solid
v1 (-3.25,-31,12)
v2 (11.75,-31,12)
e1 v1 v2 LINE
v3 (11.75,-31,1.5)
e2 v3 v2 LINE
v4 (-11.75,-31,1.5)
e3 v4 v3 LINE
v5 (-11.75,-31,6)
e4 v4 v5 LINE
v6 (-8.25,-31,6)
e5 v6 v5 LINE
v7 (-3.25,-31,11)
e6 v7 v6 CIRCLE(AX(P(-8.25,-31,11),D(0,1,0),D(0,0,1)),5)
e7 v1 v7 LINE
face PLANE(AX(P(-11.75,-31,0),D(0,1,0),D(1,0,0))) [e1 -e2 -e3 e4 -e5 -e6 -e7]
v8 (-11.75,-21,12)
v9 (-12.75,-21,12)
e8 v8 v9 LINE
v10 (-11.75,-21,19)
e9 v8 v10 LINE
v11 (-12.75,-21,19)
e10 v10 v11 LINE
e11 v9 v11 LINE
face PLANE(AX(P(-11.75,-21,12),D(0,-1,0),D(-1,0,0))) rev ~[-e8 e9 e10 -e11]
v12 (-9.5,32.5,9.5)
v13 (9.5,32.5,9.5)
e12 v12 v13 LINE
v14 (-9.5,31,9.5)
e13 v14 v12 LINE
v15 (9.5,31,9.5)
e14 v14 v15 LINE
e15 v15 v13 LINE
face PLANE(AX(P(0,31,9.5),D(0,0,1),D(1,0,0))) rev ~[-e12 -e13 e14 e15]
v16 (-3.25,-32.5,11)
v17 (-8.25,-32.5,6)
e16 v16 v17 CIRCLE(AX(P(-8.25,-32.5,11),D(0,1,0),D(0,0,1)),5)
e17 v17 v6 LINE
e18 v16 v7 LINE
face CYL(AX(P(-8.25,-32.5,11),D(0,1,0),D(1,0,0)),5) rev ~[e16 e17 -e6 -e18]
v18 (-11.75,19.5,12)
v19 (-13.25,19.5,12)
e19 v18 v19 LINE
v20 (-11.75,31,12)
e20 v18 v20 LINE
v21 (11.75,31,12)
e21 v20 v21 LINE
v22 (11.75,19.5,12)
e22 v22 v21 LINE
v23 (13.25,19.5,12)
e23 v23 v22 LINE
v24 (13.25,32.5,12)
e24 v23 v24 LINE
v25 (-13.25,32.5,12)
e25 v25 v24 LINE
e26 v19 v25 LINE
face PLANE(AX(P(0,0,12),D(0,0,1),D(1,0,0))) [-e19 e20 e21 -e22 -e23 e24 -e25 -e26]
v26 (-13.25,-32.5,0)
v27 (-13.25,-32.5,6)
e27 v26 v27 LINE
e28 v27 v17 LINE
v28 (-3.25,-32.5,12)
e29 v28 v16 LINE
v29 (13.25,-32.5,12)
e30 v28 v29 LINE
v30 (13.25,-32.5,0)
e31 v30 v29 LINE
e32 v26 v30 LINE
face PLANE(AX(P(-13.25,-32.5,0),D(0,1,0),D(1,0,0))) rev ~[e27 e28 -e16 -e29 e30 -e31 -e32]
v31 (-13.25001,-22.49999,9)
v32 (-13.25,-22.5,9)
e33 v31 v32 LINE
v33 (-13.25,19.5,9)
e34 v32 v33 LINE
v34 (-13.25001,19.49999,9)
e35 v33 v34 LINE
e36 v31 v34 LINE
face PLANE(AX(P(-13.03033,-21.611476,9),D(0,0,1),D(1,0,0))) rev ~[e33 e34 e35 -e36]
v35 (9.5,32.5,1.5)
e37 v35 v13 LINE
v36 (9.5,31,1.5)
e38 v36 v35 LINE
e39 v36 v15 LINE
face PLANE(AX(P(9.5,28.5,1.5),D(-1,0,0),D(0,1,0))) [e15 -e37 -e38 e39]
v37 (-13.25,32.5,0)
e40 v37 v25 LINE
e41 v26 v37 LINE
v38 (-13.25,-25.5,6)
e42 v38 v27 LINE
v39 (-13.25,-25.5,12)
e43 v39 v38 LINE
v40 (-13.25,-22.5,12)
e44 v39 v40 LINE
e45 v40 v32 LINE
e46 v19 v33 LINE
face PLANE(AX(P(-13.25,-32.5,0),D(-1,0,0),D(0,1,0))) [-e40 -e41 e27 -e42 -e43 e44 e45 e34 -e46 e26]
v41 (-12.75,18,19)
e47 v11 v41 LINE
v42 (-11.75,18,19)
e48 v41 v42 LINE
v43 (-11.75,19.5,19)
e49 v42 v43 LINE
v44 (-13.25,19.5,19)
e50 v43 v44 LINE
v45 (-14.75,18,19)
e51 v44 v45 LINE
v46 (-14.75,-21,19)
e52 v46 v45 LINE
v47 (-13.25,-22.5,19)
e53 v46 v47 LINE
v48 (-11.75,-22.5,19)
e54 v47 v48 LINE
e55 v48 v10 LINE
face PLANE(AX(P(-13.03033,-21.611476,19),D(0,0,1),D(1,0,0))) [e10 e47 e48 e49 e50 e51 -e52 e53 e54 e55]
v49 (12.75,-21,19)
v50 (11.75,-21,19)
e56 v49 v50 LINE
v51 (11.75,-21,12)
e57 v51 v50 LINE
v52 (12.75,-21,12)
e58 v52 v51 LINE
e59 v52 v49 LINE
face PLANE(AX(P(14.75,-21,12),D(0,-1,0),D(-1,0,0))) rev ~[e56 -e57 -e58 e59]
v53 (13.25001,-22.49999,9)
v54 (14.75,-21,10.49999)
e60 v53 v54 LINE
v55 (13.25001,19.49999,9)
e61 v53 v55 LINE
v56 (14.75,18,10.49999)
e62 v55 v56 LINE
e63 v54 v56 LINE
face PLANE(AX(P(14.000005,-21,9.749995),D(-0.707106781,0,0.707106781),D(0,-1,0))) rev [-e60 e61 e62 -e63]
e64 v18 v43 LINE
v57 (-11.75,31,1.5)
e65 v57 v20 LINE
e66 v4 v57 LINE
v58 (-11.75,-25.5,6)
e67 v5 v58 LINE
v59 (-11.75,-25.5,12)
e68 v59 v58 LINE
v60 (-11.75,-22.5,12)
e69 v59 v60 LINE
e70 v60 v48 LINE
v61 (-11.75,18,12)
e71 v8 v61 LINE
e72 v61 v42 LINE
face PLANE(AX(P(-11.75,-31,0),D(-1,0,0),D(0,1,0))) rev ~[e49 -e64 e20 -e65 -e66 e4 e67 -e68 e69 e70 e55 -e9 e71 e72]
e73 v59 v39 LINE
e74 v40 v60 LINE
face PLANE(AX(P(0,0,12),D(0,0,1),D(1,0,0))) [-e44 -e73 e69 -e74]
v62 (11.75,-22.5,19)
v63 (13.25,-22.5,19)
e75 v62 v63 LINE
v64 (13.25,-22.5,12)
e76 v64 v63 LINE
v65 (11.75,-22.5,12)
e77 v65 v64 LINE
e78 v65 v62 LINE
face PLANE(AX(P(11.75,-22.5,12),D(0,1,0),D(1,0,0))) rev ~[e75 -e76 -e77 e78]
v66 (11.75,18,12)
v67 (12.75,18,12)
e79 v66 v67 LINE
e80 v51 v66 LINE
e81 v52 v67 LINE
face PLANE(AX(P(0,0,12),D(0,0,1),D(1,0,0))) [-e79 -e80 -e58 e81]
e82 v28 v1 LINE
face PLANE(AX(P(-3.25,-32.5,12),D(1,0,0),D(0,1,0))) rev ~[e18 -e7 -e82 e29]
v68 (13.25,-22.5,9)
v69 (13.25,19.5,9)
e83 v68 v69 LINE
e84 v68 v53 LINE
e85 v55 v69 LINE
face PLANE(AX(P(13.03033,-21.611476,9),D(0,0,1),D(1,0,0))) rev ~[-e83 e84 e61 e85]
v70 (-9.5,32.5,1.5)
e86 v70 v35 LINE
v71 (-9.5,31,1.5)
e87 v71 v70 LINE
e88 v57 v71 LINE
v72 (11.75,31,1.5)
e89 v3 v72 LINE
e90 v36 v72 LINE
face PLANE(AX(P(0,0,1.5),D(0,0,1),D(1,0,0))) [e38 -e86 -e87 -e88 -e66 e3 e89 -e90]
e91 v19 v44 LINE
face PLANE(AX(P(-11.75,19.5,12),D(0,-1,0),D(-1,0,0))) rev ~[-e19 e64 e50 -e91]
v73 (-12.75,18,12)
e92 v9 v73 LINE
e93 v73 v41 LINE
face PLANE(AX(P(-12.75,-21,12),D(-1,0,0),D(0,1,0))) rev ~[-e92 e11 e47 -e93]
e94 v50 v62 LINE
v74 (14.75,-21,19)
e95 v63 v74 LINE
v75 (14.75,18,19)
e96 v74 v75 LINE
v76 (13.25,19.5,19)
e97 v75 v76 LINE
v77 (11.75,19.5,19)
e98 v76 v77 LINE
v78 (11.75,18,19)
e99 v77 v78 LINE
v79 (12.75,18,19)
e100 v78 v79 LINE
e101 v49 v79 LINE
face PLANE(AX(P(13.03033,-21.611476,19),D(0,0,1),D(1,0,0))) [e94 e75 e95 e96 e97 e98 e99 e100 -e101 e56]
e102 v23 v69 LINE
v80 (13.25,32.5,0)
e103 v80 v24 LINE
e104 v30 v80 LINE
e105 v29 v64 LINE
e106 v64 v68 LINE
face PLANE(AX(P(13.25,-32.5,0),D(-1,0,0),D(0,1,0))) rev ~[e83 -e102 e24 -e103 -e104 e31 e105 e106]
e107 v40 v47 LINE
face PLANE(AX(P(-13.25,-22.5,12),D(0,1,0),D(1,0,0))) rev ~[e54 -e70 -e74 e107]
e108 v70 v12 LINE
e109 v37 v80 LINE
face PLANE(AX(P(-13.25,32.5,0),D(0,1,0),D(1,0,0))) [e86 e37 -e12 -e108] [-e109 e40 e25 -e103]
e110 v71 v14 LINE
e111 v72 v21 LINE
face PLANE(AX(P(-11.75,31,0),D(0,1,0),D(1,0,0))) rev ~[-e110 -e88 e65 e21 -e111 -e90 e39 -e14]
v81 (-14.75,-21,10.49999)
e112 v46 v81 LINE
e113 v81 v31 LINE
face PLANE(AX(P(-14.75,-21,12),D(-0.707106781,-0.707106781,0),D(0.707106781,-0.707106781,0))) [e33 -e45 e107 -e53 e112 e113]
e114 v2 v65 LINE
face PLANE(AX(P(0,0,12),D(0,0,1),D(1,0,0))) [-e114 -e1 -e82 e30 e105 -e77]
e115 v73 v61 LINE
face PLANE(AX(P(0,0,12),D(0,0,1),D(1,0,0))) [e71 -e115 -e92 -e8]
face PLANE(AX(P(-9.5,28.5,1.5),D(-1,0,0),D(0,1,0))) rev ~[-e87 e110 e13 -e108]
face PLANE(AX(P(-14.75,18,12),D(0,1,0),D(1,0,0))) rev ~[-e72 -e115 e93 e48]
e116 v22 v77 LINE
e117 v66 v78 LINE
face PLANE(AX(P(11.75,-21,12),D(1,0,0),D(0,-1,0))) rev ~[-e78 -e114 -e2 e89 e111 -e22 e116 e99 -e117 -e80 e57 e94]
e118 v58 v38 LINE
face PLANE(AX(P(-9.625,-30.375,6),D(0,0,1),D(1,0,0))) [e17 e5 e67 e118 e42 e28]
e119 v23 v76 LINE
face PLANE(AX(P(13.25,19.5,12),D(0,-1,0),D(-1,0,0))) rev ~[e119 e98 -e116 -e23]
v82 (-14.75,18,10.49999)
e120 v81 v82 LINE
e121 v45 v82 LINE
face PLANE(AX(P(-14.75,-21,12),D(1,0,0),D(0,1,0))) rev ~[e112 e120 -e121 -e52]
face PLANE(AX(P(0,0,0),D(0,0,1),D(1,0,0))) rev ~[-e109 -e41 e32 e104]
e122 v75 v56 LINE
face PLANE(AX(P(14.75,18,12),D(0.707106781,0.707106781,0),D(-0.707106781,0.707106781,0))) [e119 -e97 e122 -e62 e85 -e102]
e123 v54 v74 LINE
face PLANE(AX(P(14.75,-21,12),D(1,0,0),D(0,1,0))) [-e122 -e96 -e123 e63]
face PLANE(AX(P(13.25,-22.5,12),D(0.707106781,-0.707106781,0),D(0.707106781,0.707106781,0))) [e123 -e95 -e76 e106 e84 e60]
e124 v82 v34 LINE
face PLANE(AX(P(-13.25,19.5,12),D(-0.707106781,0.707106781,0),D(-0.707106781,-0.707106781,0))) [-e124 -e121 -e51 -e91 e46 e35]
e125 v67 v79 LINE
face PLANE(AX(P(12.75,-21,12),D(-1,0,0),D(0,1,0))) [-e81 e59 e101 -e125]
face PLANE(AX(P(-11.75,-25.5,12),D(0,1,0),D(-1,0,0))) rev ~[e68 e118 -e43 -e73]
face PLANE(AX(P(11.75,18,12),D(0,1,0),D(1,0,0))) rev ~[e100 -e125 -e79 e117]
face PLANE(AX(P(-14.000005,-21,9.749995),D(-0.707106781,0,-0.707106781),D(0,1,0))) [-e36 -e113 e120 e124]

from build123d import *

# Parameters (mm, degrees)
F0_W      = 23.5
F0_H      = 62
F1_DEPTH  = 1.5
F2_W      = 26.5
F2_H      = 65
F2_W_2    = 23.5
F2_H_2    = 62
F3_DEPTH  = 12
F4_W      = 2
F4_H      = 39
F5_DEPTH  = 7
F7_DEPTH  = 7
F8_W      = 19
F8_H      = 5
F9_DEPTH  = 8
F11_DEPTH = 6
F12_R     = 5
F13_DEPTH = 3
F14_SIZE  = 1.49999


# Not quite as in the source:
# - a fillet or chamfer is up to 0.001 mm smaller than in the source, because OpenCascade refuses the exact size


with BuildPart() as f1:
    # F0 (on Top) → F1 (new body)
    with BuildSketch(Plane.XY):
        Rectangle(F0_W, F0_H)
    extrude(amount=F1_DEPTH)

    # F2 (on Top) → F3 (join)
    with BuildSketch(Plane.XY):
        Rectangle(F2_W, F2_H)
        Rectangle(F2_W_2, F2_H_2, mode=Mode.SUBTRACT)
    extrude(amount=F3_DEPTH)

    # F4 (on face) → F5 (join)
    with BuildSketch(Plane.XY.offset(12)):
        with Locations((-13.75, -1.5)):
            Rectangle(F4_W, F4_H)
        with Locations((13.75, -1.5)):
            Rectangle(F4_W, F4_H)
    extrude(amount=F5_DEPTH)

    # F6 (on face) → F7 (join, through all)
    with BuildSketch(Plane.XY.offset(12)):
        Polygon((14.75, -21), (11.75, -21), (11.75, -22.5), (13.25, -22.5), align=None)
        Polygon((11.75, 19.5), (11.75, 18), (14.75, 18), (13.25, 19.5), align=None)
        Polygon((-13.25, 19.5), (-14.75, 18), (-11.75, 18), (-11.75, 19.5), align=None)
        Polygon((-11.75, -22.5), (-11.75, -21), (-14.75, -21), (-13.25, -22.5), align=None)
    extrude(amount=F7_DEPTH)

    # F8 (on face) → F9 (cut)
    with BuildSketch(Plane.XY.offset(1.5)):
        with Locations((0, 31)):
            Rectangle(F8_W, F8_H)
    extrude(amount=F9_DEPTH, mode=Mode.SUBTRACT)

    # F10 (on face) → F11 (cut)
    with BuildSketch(Plane.XY.offset(12)):
        Polygon((-13.25, -25.5), (-13.25, -32.5), (-3.25, -32.5), (-3.25, -31), (-11.75, -31), (-11.75, -25.5), align=None)
    extrude(amount=-F11_DEPTH, mode=Mode.SUBTRACT)

    # F12
    f12_edges = [f1.edges().sort_by_distance(p)[0] for p in [
        (-3.25, -31.75, 6),
    ]]
    fillet(f12_edges, radius=F12_R)

    # F13 (add): faces of the model
    f13_faces = [f1.faces().sort_by_distance(p)[0] for p in [
        (-13.9907407407, -1.5, 12),
        (13.9907407407, -1.5, 12),
    ]]
    extrude(f13_faces, amount=F13_DEPTH)

    # F14 (size 1.5 in the source; OpenCascade refuses exactly that, so slightly less here)
    f14_edges = [f1.edges().sort_by_distance(p)[0] for p in [
        (-14.75, -1.5, 9),
        (14.75, -1.5, 9),
    ]]
    chamfer(f14_edges, length=F14_SIZE)


solid = f1.part
